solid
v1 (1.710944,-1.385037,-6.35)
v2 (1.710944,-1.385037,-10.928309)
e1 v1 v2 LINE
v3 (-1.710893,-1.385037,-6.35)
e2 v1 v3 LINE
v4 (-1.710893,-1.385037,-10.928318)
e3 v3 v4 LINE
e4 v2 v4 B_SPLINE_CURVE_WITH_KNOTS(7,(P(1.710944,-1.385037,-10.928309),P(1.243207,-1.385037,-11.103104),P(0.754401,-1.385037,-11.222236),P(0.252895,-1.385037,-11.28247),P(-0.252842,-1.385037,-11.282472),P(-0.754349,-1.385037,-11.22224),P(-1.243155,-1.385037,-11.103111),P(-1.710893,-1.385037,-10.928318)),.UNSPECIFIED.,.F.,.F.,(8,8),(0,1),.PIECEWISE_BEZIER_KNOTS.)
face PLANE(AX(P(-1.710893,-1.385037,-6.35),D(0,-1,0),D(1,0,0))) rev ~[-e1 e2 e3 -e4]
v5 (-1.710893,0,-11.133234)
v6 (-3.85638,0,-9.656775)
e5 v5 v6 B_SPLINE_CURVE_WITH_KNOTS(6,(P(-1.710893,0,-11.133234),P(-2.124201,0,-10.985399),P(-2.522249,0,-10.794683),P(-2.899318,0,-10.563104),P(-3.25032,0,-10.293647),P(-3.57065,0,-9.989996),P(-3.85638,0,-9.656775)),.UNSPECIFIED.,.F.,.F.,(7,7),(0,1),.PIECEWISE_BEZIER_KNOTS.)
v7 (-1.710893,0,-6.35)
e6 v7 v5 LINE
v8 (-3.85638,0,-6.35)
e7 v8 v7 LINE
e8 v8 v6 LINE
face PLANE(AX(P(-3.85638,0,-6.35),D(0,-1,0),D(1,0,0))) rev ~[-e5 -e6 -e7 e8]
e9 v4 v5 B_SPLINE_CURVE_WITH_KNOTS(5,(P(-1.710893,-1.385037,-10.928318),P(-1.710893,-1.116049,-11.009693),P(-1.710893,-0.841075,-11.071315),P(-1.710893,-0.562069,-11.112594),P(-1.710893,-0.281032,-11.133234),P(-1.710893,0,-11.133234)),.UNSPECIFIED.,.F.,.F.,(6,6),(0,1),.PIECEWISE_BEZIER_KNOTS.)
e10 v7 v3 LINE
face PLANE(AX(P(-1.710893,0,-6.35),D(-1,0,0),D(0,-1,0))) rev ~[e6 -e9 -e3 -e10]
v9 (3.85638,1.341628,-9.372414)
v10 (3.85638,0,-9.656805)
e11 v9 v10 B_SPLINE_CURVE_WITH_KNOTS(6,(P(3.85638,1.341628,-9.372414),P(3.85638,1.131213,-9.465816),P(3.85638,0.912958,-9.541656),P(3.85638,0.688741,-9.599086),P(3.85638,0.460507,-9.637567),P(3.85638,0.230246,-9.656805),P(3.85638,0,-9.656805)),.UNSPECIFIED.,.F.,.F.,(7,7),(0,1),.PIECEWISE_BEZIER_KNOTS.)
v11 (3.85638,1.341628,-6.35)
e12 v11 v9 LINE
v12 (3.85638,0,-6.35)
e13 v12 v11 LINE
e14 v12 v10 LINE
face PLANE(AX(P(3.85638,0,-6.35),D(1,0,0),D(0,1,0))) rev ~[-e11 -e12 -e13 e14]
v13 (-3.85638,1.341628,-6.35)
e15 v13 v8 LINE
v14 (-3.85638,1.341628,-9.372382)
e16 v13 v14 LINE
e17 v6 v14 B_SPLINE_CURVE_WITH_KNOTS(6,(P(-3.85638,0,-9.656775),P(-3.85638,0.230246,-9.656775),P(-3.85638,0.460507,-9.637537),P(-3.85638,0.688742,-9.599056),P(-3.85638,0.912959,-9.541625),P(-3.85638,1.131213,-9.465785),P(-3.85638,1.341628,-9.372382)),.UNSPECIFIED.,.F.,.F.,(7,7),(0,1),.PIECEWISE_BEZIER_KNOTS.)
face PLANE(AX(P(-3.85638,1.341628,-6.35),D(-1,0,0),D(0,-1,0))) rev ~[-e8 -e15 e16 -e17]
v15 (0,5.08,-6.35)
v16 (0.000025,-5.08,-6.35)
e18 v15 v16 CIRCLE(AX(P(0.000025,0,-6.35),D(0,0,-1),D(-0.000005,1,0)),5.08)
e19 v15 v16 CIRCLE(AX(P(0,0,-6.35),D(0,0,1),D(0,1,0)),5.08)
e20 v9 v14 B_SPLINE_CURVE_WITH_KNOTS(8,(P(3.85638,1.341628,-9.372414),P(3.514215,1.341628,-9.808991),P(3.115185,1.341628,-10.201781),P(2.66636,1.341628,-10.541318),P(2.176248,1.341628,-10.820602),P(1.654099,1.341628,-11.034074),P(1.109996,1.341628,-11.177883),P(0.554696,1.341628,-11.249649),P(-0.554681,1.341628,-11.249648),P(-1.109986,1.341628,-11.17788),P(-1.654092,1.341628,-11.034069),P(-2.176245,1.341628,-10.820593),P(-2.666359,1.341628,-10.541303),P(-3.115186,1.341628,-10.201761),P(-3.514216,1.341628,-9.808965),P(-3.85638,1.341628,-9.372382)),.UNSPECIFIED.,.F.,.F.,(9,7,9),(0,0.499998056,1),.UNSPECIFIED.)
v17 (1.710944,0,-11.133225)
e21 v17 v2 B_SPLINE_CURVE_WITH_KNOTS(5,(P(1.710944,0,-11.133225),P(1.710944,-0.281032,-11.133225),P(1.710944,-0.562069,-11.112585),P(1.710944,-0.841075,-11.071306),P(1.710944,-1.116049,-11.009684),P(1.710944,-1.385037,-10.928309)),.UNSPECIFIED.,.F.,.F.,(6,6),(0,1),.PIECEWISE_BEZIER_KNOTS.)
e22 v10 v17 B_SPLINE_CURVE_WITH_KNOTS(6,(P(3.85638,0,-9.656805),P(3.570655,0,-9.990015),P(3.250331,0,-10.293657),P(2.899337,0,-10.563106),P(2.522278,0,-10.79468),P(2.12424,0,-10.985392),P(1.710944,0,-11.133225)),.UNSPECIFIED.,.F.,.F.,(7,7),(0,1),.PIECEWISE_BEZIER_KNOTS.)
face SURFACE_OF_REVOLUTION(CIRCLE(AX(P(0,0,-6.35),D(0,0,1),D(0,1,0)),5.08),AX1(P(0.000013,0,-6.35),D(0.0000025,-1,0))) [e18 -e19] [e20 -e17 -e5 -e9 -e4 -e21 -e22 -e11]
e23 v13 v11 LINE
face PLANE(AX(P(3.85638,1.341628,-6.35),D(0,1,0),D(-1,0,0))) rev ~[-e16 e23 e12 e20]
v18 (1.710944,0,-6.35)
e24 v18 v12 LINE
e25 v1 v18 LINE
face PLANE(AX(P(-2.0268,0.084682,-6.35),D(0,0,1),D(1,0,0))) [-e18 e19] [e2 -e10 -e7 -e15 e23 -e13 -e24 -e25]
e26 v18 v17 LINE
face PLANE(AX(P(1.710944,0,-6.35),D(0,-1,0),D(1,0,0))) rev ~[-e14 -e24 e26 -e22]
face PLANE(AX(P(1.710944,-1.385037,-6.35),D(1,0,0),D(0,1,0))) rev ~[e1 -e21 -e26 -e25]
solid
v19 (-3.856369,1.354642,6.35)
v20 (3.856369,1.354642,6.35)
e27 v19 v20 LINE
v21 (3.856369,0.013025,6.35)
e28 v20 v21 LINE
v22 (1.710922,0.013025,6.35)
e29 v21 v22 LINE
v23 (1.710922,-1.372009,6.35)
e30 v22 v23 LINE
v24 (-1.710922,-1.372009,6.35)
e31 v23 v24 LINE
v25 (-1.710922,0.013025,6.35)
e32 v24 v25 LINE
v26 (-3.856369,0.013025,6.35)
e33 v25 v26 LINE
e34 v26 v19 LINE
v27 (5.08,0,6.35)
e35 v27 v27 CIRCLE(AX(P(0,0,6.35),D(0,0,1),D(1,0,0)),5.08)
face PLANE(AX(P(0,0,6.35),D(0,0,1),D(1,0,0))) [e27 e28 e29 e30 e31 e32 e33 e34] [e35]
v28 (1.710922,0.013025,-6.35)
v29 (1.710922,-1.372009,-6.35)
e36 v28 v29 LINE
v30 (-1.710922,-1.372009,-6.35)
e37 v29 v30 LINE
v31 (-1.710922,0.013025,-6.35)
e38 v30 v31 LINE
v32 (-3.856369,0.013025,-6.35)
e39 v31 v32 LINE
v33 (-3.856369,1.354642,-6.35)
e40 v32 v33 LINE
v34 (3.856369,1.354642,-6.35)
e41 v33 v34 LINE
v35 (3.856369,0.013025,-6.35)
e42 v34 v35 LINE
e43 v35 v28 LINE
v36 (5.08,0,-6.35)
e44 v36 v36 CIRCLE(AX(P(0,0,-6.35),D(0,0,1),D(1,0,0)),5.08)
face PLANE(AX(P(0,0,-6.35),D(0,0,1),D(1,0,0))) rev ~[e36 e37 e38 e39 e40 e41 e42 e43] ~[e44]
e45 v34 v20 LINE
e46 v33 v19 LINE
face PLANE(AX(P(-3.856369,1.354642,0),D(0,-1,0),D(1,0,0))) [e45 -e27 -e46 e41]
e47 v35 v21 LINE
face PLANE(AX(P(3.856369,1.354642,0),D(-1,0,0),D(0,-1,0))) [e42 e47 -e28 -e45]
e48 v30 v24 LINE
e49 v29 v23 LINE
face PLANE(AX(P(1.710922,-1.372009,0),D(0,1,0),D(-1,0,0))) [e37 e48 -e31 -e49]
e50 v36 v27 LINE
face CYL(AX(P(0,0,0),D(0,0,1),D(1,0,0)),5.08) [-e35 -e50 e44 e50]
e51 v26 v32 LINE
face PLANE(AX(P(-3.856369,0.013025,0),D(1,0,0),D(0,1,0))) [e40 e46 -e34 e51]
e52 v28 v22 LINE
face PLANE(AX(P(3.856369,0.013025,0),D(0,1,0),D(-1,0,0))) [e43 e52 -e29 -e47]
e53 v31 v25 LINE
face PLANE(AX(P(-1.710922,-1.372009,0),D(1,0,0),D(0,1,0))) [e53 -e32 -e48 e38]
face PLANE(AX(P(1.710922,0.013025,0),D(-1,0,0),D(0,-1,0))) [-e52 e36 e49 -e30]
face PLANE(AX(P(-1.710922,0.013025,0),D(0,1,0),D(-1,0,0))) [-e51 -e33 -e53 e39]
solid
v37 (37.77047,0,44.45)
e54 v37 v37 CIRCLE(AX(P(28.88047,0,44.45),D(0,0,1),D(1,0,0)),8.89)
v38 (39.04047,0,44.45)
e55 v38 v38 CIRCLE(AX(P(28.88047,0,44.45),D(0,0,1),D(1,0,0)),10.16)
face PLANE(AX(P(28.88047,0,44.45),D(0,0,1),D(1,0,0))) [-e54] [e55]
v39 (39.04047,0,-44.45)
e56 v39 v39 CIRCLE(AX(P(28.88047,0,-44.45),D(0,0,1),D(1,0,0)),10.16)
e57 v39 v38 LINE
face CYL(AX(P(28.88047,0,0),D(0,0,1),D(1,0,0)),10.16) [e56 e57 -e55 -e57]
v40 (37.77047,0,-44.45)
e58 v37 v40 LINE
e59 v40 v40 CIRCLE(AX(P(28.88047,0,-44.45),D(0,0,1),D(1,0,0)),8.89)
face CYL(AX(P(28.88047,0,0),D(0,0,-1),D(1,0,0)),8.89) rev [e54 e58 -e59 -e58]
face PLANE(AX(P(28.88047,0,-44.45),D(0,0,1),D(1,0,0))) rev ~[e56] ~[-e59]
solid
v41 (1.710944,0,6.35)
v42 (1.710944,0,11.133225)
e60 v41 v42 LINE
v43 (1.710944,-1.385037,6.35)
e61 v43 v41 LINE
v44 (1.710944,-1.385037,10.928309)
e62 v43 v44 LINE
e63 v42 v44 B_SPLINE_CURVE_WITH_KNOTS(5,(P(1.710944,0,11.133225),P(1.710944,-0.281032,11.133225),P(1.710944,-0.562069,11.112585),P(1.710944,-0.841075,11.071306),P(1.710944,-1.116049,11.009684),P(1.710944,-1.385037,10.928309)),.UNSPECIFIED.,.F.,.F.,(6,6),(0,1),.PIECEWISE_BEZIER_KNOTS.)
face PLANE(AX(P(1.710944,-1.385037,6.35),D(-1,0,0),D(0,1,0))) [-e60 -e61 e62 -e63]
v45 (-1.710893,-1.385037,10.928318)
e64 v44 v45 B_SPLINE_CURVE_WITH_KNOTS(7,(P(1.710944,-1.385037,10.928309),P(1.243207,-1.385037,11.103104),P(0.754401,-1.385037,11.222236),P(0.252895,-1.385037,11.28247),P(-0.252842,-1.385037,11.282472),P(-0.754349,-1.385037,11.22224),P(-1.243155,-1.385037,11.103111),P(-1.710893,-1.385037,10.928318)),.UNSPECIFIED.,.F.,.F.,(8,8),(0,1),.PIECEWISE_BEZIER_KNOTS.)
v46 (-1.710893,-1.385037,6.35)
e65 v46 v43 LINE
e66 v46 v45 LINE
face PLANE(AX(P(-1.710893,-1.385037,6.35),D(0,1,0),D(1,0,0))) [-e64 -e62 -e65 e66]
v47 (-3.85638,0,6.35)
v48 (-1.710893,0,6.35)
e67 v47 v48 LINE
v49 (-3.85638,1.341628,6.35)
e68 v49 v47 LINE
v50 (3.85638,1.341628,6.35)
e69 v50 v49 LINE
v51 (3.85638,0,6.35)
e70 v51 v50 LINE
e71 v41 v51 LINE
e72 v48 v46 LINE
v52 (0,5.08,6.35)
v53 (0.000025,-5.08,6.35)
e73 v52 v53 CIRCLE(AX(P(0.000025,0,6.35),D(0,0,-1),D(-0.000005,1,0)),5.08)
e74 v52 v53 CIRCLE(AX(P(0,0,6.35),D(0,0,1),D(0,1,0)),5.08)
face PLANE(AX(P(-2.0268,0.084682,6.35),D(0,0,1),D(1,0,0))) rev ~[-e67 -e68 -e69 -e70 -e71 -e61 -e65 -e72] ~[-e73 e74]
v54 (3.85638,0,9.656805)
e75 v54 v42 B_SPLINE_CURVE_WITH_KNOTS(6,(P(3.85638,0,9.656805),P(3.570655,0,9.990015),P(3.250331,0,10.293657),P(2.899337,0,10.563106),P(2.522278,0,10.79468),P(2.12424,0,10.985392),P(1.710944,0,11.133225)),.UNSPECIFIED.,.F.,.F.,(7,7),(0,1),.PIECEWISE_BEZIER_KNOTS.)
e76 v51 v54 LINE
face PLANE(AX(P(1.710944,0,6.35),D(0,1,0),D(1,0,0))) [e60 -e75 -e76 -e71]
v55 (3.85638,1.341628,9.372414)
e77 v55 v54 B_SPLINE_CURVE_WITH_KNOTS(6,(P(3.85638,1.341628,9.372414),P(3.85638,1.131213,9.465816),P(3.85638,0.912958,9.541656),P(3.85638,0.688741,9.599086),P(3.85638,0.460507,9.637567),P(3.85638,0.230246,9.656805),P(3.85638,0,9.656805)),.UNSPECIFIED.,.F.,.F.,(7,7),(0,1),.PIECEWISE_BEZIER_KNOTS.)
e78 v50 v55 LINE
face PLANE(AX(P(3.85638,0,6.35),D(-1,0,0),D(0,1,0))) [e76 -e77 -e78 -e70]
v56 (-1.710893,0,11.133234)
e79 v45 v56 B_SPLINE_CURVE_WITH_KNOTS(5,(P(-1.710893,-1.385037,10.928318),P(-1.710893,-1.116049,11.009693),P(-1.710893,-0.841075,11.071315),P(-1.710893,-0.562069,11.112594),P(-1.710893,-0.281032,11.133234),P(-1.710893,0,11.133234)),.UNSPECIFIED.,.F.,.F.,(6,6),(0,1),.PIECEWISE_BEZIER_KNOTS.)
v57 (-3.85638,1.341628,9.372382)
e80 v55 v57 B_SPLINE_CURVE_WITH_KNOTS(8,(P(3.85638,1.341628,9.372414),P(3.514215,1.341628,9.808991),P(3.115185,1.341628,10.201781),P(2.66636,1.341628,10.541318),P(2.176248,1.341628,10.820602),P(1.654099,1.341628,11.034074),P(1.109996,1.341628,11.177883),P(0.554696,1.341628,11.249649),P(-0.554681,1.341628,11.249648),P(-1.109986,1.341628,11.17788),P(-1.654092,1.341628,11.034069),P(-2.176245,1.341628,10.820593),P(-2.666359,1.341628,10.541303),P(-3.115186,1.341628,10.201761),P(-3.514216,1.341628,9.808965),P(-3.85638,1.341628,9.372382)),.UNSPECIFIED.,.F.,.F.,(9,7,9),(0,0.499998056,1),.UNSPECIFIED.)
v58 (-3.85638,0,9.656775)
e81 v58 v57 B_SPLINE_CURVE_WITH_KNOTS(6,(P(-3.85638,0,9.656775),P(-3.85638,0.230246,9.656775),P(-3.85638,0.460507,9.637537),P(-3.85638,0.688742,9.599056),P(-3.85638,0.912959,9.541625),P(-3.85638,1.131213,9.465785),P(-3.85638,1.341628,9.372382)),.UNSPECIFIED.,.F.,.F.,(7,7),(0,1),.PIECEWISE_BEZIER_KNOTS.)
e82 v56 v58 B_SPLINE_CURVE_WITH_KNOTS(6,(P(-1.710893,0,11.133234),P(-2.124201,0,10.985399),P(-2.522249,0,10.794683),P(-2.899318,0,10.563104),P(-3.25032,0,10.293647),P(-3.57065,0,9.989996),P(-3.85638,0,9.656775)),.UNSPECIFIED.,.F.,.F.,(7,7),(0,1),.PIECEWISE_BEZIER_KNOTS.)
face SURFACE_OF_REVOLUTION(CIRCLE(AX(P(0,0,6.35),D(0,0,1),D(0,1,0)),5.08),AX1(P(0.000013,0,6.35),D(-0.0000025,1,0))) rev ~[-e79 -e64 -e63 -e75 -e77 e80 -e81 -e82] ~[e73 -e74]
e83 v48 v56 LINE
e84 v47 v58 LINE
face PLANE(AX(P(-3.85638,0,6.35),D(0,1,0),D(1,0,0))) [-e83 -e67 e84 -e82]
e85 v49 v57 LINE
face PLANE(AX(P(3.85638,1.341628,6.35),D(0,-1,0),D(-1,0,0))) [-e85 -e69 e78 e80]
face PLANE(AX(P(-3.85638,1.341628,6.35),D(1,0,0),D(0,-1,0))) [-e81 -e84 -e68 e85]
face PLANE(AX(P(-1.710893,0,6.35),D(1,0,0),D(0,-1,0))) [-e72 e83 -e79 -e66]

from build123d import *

# Parameters (mm, degrees)
F5_ANGLE       = 180
F6_DEPTH       = 18
F7_REACH       = 9.8039879523
F8_ANGLE       = 180
F9_REACH       = 9.8039879523
F0_R           = 5.08
F10_DEPTH      = 6.35
F10_DEPTH_BACK = 6.35
F11_R          = 10.16
F11_R_2        = 8.89
F12_DEPTH      = 44.45


# Not quite as in the source:
# - after a boolean that leaves OpenCascade's solid faulty, fix() repairs it
# - an extrude ends at something that could not be found from the text; its depth is read off the source's solid
# - ends of sketch curves that miss each other by under 0.0002 mm in the source are joined


with BuildPart() as f5:
    # F3 (on offset) → F5 (revolve)
    with BuildSketch(Plane.XY.offset(6.35)):
        with BuildLine():
            Line((9.3459e-06, 1.341628), (0, 5.08))
            ThreePointArc((0, 5.08), (-5.08, -1.27e-05), (2.54e-05, -5.08))
            Line((2.54e-05, -5.08), (1.61626e-05, -1.3850366))
            Line((1.61626e-05, -1.3850366), (-1.7108932, -1.3850366))
            Line((-1.7108932, -1.3850366), (-1.7108932, 0))
            Line((-1.7108932, 0), (-3.8563804, 0))
            Line((-3.8563804, 0), (-3.8563804, 1.341628))
            Line((-3.8563804, 1.341628), (9.3459e-06, 1.341628))
        make_face()
        Polygon((0, 0), (0, 1.341628), (-3.8563804, 1.341628), (-3.8563804, 0), (-1.7108932, 0), (-1.7108932, -1.3850366), (1.61626e-05, -1.3850366), align=None)
    revolve(axis=Axis((1.27e-05, 0, 6.35), (-2.5e-06, 1, 0)), revolution_arc=F5_ANGLE)

    # F3 (on offset) → F6 (cut, through all)
    with BuildSketch(Plane.XY.offset(6.35)):
        Polygon((3.8563804, 1.341628), (0, 1.341628), (0, 0), (1.61626e-05, -1.3850366), (1.710944, -1.3850366), (1.710944, 0), (3.8563804, 0), align=None)
        Polygon((0, 0), (0, 1.341628), (-3.8563804, 1.341628), (-3.8563804, 0), (-1.7108932, 0), (-1.7108932, -1.3850366), (1.61626e-05, -1.3850366), align=None)
    extrude(amount=-F6_DEPTH, mode=Mode.SUBTRACT)

    add(f5.part.fix(), mode=Mode.REPLACE)

    f7_end = f5.faces().sort_by_distance((1.27e-05, 0, 11.4300127))[0]
    # F3 (on offset) → F7 (cut, up to a face of the model that its end follows)
    with BuildSketch(Plane.XY.offset(6.35)):
        Polygon((0, 0), (0, 1.341628), (-3.8563804, 1.341628), (-3.8563804, 0), (-1.7108932, 0), (-1.7108932, -1.3850366), (1.61626e-05, -1.3850366), align=None)
        Polygon((3.8563804, 1.341628), (0, 1.341628), (0, 0), (1.61626e-05, -1.3850366), (1.710944, -1.3850366), (1.710944, 0), (3.8563804, 0), align=None)
    f7_long = extrude(amount=F7_REACH, mode=Mode.PRIVATE)
    add(split(f7_long, bisect_by=f7_end, keep=Keep.BOTTOM, mode=Mode.PRIVATE), mode=Mode.SUBTRACT)


with BuildPart() as f8:
    # F4 (on offset) → F8 (revolve)
    with BuildSketch(Plane.XY.offset(-6.35)):
        with BuildLine():
            Line((9.3459e-06, 1.341628), (0, 5.08))
            ThreePointArc((0, 5.08), (-5.08, -1.27e-05), (2.54e-05, -5.08))
            Line((2.54e-05, -5.08), (1.61626e-05, -1.3850366))
            Line((1.61626e-05, -1.3850366), (-1.7108932, -1.3850366))
            Line((-1.7108932, -1.3850366), (-1.7108932, 0))
            Line((-1.7108932, 0), (-3.8563804, 0))
            Line((-3.8563804, 0), (-3.8563804, 1.341628))
            Line((-3.8563804, 1.341628), (9.3459e-06, 1.341628))
        make_face()
        Polygon((0, 0), (0, 1.341628), (-3.8563804, 1.341628), (-3.8563804, 0), (-1.7108932, 0), (-1.7108932, -1.3850366), (1.61626e-05, -1.3850366), align=None)
    revolve(axis=Axis((1.27e-05, 0, -6.35), (2.5e-06, -1, 0)), revolution_arc=F8_ANGLE)

    f9_end = f8.faces().sort_by_distance((1.27e-05, 0, -11.4300127))[0]
    # F4 (on offset) → F9 (cut, up to a face of the model that its end follows)
    with BuildSketch(Plane.XY.offset(-6.35)):
        Polygon((3.8563804, 1.341628), (0, 1.341628), (0, 0), (1.61626e-05, -1.3850366), (1.710944, -1.3850366), (1.710944, 0), (3.8563804, 0), align=None)
        Polygon((0, 0), (0, 1.341628), (-3.8563804, 1.341628), (-3.8563804, 0), (-1.7108932, 0), (-1.7108932, -1.3850366), (1.61626e-05, -1.3850366), align=None)
    f9_long = extrude(amount=-F9_REACH, mode=Mode.PRIVATE)
    add(split(f9_long, bisect_by=f9_end, keep=Keep.BOTTOM, mode=Mode.PRIVATE), mode=Mode.SUBTRACT)


with BuildPart() as f10:
    # F0 (on Top) → F10 (new body, two sides)
    with BuildSketch(Plane.XY) as f10_sk:
        Circle(F0_R)
        Polygon((-3.856369298, 1.3546424612), (0, 1.3546424612), (3.856369298, 1.3546424612), (3.856369298, 0.013024848), (1.7109218004, 0.013024848), (1.7109218004, -1.3720089252), (0, -1.3720089252), (-1.7109218004, -1.3720089252), (-1.7109218004, 0.013024848), (-3.856369298, 0.013024848), align=None, mode=Mode.SUBTRACT)
    extrude(amount=F10_DEPTH)
    extrude(f10_sk.sketch, amount=-F10_DEPTH_BACK)


with BuildPart() as f12:
    # F11 (on Top) → F12 (new body, symmetric)
    with BuildSketch(Plane.XY):
        with Locations((28.880469501, 0)):
            Circle(F11_R)
        with Locations((28.880469501, 0)):
            Circle(F11_R_2, mode=Mode.SUBTRACT)
    extrude(amount=F12_DEPTH, both=True)


solid = Compound([f5.part, f8.part, f10.part, f12.part])
